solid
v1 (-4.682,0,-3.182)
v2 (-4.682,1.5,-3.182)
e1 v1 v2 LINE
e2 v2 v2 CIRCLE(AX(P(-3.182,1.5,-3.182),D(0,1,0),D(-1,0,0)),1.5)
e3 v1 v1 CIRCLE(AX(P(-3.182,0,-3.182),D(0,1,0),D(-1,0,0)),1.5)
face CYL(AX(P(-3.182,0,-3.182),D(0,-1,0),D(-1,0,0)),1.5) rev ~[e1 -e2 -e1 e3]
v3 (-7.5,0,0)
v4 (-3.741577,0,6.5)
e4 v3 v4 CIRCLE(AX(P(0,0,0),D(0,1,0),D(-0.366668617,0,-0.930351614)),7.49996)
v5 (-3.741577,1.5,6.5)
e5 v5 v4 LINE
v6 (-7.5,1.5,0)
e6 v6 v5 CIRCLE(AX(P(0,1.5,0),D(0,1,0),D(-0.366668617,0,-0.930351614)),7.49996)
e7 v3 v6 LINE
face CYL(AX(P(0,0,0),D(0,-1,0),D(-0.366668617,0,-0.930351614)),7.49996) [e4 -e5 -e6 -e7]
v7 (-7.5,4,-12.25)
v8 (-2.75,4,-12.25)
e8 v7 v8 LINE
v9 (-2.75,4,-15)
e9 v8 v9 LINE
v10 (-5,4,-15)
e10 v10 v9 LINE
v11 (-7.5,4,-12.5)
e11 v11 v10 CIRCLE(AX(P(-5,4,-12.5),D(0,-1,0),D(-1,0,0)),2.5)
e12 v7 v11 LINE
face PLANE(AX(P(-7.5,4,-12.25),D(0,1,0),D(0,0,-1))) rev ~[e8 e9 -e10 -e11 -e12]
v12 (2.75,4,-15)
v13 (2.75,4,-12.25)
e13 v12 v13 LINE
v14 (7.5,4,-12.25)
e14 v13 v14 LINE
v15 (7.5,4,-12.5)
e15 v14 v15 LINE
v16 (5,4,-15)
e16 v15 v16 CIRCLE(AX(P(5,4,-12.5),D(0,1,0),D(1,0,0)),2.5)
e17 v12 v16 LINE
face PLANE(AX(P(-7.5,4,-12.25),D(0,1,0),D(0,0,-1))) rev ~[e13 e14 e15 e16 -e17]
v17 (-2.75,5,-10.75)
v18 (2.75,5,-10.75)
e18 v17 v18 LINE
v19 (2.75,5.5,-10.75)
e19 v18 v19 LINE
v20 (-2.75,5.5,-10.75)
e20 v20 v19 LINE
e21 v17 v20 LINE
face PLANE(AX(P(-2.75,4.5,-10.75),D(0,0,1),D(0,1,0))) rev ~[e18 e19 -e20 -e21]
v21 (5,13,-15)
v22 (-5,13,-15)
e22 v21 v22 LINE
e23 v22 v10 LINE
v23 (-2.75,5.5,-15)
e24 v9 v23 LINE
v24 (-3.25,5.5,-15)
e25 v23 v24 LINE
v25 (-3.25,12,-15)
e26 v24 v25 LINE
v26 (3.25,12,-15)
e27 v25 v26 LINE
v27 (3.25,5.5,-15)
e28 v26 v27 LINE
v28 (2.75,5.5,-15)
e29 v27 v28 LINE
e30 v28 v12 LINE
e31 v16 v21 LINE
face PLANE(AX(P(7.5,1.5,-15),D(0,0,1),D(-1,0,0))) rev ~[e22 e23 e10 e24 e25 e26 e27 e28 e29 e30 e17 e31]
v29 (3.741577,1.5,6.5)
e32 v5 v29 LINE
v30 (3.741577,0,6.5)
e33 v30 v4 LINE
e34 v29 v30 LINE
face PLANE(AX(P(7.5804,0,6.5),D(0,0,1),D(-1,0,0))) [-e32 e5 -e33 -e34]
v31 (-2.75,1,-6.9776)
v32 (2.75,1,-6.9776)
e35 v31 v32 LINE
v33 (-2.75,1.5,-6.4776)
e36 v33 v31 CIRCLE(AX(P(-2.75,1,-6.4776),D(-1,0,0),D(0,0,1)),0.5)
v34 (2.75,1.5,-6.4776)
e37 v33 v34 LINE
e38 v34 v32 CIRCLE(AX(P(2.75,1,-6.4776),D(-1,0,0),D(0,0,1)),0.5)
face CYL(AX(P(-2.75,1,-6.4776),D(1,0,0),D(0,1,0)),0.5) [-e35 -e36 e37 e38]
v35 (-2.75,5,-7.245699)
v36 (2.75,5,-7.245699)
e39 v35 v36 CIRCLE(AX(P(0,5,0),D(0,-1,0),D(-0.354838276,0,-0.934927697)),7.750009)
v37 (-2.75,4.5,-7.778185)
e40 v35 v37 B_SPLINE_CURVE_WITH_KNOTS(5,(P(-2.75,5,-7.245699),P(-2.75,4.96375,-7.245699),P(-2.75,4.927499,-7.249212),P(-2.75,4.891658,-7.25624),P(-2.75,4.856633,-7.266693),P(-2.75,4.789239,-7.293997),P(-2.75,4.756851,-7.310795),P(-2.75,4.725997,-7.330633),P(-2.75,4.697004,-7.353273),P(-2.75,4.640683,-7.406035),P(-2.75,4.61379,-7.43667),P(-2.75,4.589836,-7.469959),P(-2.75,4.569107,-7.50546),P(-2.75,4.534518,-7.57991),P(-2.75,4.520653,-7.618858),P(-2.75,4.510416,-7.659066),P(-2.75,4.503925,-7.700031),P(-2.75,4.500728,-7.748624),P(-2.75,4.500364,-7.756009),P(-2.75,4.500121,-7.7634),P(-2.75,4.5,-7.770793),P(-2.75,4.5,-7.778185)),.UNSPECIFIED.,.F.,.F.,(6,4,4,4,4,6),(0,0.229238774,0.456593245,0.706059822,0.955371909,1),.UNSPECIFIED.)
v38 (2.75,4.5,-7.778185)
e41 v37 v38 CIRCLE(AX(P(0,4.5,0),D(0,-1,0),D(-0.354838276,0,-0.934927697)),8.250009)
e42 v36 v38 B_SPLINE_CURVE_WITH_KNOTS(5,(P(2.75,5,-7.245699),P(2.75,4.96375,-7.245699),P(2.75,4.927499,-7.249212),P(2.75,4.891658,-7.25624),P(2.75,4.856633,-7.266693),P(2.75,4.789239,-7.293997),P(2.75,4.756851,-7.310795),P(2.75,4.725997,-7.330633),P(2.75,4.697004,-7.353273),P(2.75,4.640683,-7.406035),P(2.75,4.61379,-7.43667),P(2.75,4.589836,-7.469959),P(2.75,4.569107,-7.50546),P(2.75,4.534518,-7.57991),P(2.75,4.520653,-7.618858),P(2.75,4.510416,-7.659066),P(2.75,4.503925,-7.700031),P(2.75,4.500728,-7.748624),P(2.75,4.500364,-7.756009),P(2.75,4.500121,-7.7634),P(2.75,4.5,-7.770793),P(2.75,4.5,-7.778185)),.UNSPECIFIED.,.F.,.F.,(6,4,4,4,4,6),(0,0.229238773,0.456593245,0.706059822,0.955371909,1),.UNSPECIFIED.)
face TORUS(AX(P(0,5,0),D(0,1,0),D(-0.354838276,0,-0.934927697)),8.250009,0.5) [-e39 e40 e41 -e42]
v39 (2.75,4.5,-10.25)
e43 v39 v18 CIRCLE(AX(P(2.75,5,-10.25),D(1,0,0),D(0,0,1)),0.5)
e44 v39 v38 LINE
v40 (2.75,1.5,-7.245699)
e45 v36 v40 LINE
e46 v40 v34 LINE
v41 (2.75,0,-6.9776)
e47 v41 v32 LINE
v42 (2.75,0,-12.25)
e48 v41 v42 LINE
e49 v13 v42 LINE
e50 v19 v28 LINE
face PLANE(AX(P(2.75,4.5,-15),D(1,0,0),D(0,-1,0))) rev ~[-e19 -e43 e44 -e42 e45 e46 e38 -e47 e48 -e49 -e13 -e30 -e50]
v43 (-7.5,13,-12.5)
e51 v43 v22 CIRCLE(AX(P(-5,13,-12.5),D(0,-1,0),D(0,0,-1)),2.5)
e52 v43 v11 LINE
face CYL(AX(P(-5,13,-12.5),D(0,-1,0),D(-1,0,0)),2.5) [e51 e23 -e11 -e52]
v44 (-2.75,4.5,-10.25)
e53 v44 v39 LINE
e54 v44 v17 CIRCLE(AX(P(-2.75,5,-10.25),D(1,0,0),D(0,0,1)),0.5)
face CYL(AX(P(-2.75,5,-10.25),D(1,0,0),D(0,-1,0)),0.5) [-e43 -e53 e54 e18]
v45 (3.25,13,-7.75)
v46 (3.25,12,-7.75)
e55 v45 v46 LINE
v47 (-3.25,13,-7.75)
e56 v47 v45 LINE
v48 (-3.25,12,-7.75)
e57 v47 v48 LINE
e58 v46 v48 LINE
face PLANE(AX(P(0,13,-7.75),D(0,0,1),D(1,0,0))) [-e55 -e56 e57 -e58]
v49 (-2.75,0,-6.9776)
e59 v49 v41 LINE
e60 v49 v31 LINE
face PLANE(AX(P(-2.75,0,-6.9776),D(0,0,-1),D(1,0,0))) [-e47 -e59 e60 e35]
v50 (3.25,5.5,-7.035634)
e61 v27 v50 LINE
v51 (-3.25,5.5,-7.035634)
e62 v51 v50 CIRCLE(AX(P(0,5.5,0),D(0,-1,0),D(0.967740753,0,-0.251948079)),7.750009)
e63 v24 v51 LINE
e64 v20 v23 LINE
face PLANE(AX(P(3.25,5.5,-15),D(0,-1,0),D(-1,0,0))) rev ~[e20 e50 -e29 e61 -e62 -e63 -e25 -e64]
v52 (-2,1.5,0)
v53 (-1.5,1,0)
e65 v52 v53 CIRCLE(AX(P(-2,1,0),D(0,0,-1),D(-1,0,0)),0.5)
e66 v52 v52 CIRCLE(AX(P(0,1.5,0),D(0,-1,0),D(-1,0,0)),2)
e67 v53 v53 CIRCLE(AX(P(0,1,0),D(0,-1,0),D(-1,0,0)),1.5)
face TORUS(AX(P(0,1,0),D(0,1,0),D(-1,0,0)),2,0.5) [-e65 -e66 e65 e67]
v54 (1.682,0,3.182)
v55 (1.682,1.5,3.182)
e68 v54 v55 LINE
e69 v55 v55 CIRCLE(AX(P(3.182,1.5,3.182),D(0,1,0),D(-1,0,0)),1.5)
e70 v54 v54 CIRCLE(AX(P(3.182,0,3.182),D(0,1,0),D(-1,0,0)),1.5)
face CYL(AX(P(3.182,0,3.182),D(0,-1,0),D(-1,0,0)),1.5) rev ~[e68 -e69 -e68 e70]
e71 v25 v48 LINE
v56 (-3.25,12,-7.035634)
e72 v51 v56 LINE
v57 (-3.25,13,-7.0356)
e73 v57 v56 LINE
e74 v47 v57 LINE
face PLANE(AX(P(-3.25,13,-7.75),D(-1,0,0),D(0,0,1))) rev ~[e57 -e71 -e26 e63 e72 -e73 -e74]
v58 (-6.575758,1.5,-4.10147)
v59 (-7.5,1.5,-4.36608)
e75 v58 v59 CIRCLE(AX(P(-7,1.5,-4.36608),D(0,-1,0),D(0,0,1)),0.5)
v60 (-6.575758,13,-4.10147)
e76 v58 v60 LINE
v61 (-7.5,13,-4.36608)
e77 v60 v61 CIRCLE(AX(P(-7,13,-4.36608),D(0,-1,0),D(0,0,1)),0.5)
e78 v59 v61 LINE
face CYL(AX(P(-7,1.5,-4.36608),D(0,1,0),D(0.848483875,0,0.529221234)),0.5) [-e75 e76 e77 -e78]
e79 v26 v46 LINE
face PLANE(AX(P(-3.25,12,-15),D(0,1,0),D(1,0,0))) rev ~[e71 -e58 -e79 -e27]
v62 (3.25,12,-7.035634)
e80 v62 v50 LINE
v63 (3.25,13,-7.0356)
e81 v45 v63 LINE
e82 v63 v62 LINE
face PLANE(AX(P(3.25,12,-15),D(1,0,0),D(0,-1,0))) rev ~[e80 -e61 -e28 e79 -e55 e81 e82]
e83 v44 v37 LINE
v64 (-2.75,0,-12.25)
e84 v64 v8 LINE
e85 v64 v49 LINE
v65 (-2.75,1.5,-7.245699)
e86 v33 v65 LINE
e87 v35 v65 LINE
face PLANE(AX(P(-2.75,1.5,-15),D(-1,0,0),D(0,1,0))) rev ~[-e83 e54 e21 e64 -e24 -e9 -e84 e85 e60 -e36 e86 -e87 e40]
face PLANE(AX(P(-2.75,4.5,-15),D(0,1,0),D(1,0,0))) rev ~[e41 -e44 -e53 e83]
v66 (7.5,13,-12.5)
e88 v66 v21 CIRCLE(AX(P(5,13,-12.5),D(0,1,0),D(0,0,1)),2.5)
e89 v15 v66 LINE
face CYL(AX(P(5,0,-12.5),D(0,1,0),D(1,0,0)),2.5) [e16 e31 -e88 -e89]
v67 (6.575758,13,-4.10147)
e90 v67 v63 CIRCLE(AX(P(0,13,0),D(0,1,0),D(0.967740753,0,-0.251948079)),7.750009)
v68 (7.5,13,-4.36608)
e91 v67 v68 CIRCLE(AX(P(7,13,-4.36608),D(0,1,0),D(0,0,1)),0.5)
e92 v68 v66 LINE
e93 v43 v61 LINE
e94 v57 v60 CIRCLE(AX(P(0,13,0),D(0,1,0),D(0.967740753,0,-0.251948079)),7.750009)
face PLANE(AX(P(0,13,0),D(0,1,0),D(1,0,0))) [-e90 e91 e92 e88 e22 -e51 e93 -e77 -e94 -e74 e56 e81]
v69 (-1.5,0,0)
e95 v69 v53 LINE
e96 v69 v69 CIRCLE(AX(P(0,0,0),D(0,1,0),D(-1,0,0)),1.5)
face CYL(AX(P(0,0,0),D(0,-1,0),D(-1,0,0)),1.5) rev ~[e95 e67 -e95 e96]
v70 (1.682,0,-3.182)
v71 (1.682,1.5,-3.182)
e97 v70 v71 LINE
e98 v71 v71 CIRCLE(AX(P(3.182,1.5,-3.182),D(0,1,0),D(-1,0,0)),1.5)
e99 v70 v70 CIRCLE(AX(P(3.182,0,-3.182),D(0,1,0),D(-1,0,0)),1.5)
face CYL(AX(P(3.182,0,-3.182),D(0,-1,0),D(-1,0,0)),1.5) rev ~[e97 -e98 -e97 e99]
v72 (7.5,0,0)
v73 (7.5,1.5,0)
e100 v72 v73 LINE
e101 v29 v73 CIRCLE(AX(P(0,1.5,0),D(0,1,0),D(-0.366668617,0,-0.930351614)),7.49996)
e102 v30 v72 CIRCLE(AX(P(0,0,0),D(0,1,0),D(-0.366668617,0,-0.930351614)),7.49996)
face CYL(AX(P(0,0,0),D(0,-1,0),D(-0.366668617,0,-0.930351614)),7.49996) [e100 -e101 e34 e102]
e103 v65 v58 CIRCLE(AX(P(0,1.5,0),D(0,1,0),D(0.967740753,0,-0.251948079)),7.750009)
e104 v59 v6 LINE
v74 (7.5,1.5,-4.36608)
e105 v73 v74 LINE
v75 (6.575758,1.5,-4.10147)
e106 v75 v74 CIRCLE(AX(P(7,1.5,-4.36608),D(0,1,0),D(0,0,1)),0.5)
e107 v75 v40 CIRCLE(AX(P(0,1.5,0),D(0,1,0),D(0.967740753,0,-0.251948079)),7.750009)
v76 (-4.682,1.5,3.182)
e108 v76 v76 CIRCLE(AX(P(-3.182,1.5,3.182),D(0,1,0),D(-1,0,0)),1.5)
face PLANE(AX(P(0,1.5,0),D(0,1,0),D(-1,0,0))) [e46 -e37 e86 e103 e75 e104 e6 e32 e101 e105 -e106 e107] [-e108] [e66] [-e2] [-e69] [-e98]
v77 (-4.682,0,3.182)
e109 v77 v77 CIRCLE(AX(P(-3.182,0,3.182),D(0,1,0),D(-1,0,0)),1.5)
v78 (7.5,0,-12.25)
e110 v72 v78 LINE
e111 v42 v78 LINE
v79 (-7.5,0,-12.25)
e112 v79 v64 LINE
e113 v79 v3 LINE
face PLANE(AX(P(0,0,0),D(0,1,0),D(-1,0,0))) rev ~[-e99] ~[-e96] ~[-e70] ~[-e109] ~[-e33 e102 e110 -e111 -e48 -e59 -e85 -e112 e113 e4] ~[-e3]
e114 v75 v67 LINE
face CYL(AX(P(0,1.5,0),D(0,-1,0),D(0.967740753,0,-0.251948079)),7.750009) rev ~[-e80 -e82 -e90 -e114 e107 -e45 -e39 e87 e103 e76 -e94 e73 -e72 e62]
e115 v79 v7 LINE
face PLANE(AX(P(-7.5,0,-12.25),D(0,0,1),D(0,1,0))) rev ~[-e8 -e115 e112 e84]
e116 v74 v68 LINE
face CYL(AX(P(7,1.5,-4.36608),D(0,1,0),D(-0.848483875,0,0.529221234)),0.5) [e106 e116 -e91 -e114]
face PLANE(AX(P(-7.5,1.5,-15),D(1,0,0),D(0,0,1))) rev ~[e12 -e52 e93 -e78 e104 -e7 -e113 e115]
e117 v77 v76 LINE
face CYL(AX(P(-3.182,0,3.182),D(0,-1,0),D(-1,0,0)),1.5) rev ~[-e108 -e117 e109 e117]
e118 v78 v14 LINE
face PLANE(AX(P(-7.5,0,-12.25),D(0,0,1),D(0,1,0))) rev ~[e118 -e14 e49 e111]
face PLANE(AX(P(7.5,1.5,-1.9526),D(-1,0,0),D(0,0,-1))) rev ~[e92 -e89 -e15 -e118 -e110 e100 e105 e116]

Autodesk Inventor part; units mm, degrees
sketch "Náčrt1" plane through (0, 0, 0) normal (0, 1, 0) x (-1, 0, 0)
  arc A0 (2.75, -6.9776) -> (-2.75, -6.9776) centre (0, 0) ccw
  line L0 (-7.5, 0) -> (-7.5, -15)
  line L1 (7.5, -15) -> (7.5, 0)
  line L2 (2.75, -6.9776) -> (-2.75, -6.9776)
  line L3 (-2.75, -6.9776) -> (-2.75, -15)
  line L4 (2.75, -15) -> (2.75, -6.9776)
  circle A1 centre (4.5, 0) radius 1.5
  circle A2 centre (0, 0) radius 1.5
  circle A3 centre (0, 4.5) radius 1.5
  circle A4 centre (-4.5, 0) radius 1.5
  circle A5 centre (0, -4.5) radius 1.5
  line L5 (-7.5, -15) -> (-2.75, -15)
  line L6 (2.75, -15) -> (7.5, -15)
  circle A6 centre (3.182, 3.182) radius 1.5
  circle A7 centre (0, 4.5) radius 1.5
  circle A8 centre (-3.182, 3.182) radius 1.5
  circle A9 centre (-4.5, 0) radius 1.5
  circle A10 centre (-3.182, -3.182) radius 1.5
  circle A11 centre (0, -4.5) radius 1.5
  circle A12 centre (3.182, -3.182) radius 1.5
  line L7 (-1.5, 0) -> (-3, 0)
  line L8 (-6, 0) -> (-7.5, 0)
  line L9 (7.5, 0) -> (6, 0)
  line L10 (3, 0) -> (1.5, 0)
  dimension "d0" = 15
  dimension "d1" = 3
  dimension "d2" = 3
  dimension "d5" = 360
  dimension "d7" = 4.5
  dimension "d8" = 5.5
  dimension "d9" = 15
  dimension "d10" = 15
  dimension "d13" = 360
extrude "Vysunutí1" add sketch "Náčrt1" along normal blind 1.5 contours L2 A0 L8 A4 L7 A2 L10 A1 L9 | A0 L1 L6 L4 | L9 A1 L10 A2 L7 A4 L8 A0 | L3 L5 L0 A0 | A1 | A4 | A3 | A5
ref_plane "Pracovní rovina1" through (0, 1.5, 0) normal (0, 1, 0) x (1, 0, 0)
sketch "Náčrt3" plane through (0, 1.5, 0) normal (0, 1, 0) x (1, 0, 0)
  arc A0 (7.5, 1.9526) -> (-7.5, 1.9526) centre (0, 0) ccw
  line L0 (-7.5, 15) -> (-7.5, 0) projected
  line L1 (7.5, 15) -> (2.75, 15) projected
  line L2 (7.5, 1.9526) -> (7.5, 15)
  line L3 (7.5, 15) -> (-7.5, 15)
  line L4 (-7.5, 15) -> (-7.5, 1.9526)
  dimension "d18" = 15.5
extrude "Vysunutí2" add sketch "Náčrt3" along normal blind 11.5
ref_plane "Pracovní rovina2" through (-2.75, 0, -15) normal (0, 0, -1) x (-1, 0, 0)
sketch "Náčrt4" plane through (-2.75, 0, -15) normal (0, 0, -1) x (-1, 0, 0)
  line L0 (-5.5, 0) -> (-5.5, 1.5) projected
  line L1 (-5.5, 1.5) -> (0, 1.5)
  line L2 (0, 1.5) -> (0, 4.5)
  line L3 (0, 4.5) -> (-5.5, 4.5)
  line L4 (-5.5, 4.5) -> (-5.5, 1.5)
  point P0 (-2.75, 0)
  dimension "d51" = 3
extrude "Vysunutí3" cut sketch "Náčrt4" against normal blind 9
fillet "Zaoblení1" radius 0.5 1 edges at (7.5, 7.25, -1.9526)
fillet "Zaoblení2" radius 0.5 1 edges at (-7.5, 7.25, -1.9526)
sketch "Náčrt9" plane through (-2.75, 0, -15) normal (0, 0, -1) x (-1, 0, 0)
  line L0 (0, 0) -> (0, 4.5) projected
  line L1 (0, 0) -> (4.75, 0) projected
  line L2 (4.75, 0) -> (4.75, 13) projected
  line L3 (-10.25, 13) -> (4.75, 13) projected
  line L4 (-10.25, 0) -> (-10.25, 13) projected
  line L5 (-10.25, 0) -> (-5.5, 0) projected
  line L6 (-5.5, 0) -> (-5.5, 4.5) projected
  line L7 (-6, 5.5) -> (0.5, 5.5)
  line L8 (0.5, 5.5) -> (0.5, 12)
  line L9 (0.5, 12) -> (-6, 12)
  line L10 (-6, 12) -> (-6, 5.5)
  line L11 (-5.5, 4.5) -> (0, 4.5) projected
  point P0 (-2.75, 0)
  dimension "d28" = 6.5
  dimension "d29" = 6.5
  dimension "d31" = 0.5
  dimension "d50" = 1
extrude "Vysunutí5" cut sketch "Náčrt9" against normal blind 8 contours L10 L9 L8 L7
fillet "Zaoblení4" radius 0.5 1 edges at (1.5, 1.5, 0)
fillet "Zaoblení5" radius 2.5 2 edges at (-7.5, 6.5, -15) (7.5, 6.5, -15)
fillet "Zaoblení6" radius 0.5 2 edges at (0, 4.5, -7.75) (0, 1.5, -6.9776)
ref_plane "Pracovní rovina3" through (0, 13, 0) normal (0, 1, 0) x (1, 0, 0)
sketch "Náčrt10" plane through (0, 13, 0) normal (0, 1, 0) x (1, 0, 0)
  arc A0 (3.25, 7.0356) -> (-3.25, 7.0356) centre (0, 0) ccw projected
  line L0 (-3.25, 15) -> (-3.25, 7.0356) projected
  line L1 (3.25, 15) -> (-3.25, 15) projected
  line L2 (3.25, 15) -> (3.25, 7.0356) projected
  line L3 (3.25, 7.0356) -> (-3.25, 7.0356)
  line L4 (-3.25, 7.0356) -> (-3.25, 7.75)
  line L5 (-3.25, 7.75) -> (3.25, 7.75)
  line L6 (3.25, 7.75) -> (3.25, 7.0356)
extrude "Vysunutí6" cut sketch "Náčrt10" against normal blind 2 contours L3 A0 | A0 L5 L2 | A0 L0 L5
sketch "Sketch11" plane through (-7.5, 0, 0) normal (-1, 0, 0) x (0, 0, 1)
  line L0 (-15, 0) -> (-6.9776, 0) projected
  line L1 (-15, 0) -> (-12.25, 0)
  line L2 (-12.25, 0) -> (-12.25, 4)
  line L3 (-12.25, 4) -> (-15, 4)
  line L4 (-15, 4) -> (-15, 0)
  point P0 (0, 0)
  dimension "d42" = 2.75
  dimension "d43" = 4
extrude "Extrusion7" cut sketch "Sketch11" against normal through all
sketch "Sketch12" plane through (0, 0, 0) normal (0, -1, 0) x (1, 0, 0)
  line L0 (7.5804, 6.5) -> (-7.5515, 6.5)
  line L1 (-7.5515, 6.5) -> (-7.5515, 9.7793)
  line L2 (-7.5515, 9.7793) -> (7.5804, 9.7793)
  line L3 (7.5804, 9.7793) -> (7.5804, 6.5)
  arc A0 (7.5, 0) -> (-7.5, 0) centre (0, 0) ccw projected
  dimension "d46" = 1
extrude "Extrusion8" cut sketch "Sketch12" against normal through all
sketch "Sketch13" plane through (-2.75, 1.5, -7.2457) normal (1, 0, 0) x (0, 0, -1)
  line L0 (7.7543, 2.5) -> (7.7543, 3) projected
  line L1 (7.7543, 3) -> (3.5043, 3)
  line L2 (3.5043, 3) -> (3.5043, 4)
  line L3 (3.5043, 4) -> (7.7543, 4)
  line L4 (7.7543, 4) -> (7.7543, 3)
  line L5 (5.0043, -1.5) -> (5.0043, 2.5) projected
  point P0 (-7.2457, -1.5)
  dimension "d52" = 1.5
extrude "Extrusion9" cut sketch "Sketch13" along normal up to surface (5.5 mm away)
fillet "Fillet8" radius 0.5 1 edges at (0, 4.5, -10.75)
equation "\"d9\" = d0"
equation "\"d29\" = d28"
equation "\"d31\" = -0.5 * d8 + 0.5 * d28"
properties part number "uchyt motoru-final"
